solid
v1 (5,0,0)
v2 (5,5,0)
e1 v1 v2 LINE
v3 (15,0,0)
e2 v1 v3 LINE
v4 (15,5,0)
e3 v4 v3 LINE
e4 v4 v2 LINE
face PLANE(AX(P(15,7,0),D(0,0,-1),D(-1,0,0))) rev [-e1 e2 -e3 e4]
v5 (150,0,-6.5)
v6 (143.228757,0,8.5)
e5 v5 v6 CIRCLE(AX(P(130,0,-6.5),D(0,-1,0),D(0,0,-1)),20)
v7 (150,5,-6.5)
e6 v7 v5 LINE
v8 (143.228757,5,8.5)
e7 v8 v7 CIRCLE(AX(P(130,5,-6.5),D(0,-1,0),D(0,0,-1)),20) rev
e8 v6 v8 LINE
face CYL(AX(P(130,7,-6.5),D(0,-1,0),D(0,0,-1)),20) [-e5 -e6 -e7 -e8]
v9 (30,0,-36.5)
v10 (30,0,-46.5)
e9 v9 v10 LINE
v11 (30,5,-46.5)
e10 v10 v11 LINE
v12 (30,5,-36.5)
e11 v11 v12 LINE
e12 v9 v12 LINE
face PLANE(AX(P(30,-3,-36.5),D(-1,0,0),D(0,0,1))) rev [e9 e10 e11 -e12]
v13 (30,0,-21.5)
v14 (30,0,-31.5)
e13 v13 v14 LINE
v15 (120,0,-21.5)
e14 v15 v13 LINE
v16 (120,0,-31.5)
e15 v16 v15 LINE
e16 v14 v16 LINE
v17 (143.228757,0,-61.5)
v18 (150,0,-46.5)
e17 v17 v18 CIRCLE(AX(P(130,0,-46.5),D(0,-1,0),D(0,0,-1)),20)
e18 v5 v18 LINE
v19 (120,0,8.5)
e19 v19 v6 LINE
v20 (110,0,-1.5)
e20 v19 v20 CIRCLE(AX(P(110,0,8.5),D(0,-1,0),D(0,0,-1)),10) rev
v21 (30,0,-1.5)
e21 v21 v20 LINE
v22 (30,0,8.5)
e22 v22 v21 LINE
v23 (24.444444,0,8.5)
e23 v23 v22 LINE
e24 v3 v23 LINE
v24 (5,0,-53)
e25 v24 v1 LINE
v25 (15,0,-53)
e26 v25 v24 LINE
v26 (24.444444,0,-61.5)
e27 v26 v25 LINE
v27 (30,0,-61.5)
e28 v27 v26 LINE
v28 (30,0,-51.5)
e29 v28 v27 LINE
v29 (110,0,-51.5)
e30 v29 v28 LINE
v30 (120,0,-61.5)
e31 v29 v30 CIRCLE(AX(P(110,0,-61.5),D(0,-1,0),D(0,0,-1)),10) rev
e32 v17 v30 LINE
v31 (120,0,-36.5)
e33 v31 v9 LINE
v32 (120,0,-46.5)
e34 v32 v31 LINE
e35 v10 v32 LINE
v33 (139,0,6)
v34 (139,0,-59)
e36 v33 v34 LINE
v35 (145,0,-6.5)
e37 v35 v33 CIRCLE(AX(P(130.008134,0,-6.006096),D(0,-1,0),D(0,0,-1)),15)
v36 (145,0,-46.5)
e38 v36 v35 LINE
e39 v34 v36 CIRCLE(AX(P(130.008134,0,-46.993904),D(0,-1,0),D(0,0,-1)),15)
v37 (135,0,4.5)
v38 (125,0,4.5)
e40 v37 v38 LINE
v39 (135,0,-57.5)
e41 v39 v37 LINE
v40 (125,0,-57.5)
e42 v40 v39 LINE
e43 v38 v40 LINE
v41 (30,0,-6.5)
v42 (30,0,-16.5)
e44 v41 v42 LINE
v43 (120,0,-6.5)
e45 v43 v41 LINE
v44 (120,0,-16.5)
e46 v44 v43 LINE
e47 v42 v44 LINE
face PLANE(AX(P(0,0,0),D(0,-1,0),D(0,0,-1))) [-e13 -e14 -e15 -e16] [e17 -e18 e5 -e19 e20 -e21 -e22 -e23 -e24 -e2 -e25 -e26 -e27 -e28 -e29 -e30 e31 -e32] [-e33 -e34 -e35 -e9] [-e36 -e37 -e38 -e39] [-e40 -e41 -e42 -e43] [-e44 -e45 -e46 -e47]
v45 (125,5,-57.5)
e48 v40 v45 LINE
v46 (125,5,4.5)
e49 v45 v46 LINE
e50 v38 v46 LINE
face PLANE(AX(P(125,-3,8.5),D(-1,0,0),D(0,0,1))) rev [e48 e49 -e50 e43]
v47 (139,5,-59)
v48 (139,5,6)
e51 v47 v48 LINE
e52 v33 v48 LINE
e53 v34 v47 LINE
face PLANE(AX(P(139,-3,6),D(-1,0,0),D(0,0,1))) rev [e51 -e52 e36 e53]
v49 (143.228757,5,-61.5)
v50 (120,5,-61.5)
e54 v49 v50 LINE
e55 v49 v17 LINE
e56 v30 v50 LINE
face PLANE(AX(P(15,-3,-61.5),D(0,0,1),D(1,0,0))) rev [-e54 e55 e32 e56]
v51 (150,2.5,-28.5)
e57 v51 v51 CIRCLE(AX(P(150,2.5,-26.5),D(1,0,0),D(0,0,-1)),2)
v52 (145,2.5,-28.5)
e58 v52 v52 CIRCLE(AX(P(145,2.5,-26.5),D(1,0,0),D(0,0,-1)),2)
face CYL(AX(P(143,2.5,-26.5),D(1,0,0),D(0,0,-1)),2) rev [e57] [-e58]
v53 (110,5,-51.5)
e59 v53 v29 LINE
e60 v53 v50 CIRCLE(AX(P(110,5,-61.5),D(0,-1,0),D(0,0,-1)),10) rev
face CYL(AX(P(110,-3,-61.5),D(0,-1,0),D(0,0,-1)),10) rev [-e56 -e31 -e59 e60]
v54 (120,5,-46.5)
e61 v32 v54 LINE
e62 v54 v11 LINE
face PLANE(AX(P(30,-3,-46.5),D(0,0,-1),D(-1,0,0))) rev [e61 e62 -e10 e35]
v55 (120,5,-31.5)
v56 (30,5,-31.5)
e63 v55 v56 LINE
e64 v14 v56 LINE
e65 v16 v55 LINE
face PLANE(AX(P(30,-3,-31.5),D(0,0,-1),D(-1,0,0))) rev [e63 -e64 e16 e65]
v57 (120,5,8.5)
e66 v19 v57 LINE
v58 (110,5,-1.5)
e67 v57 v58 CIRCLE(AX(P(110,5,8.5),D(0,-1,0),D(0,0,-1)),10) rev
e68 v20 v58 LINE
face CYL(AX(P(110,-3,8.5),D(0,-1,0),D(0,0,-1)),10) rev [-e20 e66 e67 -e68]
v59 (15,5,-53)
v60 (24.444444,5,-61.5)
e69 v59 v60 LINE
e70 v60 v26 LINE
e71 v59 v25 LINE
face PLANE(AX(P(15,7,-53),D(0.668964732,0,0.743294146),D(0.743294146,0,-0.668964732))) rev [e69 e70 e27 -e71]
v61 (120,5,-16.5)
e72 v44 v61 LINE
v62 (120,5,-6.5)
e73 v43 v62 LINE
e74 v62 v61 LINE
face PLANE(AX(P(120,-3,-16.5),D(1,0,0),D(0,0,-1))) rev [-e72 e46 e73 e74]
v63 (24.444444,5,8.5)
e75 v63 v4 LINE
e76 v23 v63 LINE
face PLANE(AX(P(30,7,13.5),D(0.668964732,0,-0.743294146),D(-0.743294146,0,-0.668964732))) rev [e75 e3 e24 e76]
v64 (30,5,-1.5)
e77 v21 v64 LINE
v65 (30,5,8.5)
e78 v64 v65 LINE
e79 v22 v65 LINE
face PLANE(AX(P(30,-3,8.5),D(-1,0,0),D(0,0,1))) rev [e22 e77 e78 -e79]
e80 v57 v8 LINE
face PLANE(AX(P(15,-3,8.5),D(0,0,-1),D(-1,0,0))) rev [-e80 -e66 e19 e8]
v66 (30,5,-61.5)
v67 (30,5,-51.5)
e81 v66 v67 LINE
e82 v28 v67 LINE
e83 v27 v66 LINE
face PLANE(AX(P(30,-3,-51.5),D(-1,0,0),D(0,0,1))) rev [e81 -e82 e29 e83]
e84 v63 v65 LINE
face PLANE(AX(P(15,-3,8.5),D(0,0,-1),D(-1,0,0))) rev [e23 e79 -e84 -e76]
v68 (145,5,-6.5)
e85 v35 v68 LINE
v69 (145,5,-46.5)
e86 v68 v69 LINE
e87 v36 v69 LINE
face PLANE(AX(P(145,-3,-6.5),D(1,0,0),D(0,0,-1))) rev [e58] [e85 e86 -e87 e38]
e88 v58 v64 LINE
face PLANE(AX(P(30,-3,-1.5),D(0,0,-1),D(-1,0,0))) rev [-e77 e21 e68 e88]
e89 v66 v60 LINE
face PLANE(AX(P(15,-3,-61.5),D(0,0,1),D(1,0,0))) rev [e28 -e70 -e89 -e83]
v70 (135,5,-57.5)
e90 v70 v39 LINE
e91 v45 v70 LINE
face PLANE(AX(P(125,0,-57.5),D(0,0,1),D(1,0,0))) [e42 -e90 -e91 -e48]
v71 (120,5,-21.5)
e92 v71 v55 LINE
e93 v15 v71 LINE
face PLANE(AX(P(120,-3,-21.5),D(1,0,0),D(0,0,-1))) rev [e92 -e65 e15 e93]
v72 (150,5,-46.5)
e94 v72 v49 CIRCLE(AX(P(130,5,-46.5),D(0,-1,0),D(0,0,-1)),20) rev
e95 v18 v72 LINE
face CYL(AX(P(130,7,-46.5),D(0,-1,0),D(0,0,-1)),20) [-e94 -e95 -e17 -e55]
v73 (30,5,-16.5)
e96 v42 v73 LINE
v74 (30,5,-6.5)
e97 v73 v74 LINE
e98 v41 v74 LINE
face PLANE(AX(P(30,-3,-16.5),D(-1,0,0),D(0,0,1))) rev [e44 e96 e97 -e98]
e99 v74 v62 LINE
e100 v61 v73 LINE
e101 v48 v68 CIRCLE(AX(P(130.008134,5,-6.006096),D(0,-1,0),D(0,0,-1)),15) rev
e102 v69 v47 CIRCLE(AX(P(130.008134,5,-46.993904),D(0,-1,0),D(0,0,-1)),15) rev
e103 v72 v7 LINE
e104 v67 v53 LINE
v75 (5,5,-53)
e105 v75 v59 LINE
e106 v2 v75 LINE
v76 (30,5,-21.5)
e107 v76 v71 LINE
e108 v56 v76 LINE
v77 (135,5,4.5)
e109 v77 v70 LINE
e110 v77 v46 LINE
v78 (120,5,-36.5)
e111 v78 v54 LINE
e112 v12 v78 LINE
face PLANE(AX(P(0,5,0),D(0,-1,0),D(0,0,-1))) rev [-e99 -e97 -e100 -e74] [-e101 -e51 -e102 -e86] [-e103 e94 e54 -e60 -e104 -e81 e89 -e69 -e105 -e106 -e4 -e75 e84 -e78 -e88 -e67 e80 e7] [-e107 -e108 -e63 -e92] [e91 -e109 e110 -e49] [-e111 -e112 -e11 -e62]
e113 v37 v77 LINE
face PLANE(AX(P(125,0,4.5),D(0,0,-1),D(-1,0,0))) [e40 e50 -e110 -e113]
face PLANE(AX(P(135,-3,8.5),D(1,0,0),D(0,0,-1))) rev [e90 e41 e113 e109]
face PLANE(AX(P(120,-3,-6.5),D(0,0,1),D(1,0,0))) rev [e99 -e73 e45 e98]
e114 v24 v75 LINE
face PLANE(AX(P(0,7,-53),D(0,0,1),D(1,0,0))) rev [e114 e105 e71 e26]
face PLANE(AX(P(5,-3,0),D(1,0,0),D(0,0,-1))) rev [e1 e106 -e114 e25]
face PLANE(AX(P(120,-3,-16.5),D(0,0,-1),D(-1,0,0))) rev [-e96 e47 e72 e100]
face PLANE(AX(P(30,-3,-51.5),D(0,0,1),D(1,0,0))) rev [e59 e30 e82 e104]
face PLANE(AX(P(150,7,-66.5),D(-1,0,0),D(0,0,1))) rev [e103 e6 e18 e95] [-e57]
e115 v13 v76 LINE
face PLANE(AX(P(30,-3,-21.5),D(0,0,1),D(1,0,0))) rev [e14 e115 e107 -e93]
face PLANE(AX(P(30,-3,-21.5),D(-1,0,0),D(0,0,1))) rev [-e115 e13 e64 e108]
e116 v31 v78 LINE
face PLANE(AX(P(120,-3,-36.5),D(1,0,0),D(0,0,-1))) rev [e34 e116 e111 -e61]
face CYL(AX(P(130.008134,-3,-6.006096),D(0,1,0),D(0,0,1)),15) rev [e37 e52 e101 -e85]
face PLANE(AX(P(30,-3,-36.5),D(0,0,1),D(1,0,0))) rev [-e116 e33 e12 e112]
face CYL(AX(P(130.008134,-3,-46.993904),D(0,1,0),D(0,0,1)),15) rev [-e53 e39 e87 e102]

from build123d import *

# Parameters (mm, degrees)
Y_KSEKLIK_EKSTR_ZYON1_DEPTH = 7
IZIM2_R                     = 1.5
KES_EKSTR_ZYON1_DEPTH       = 7
PAH1_SIZE                   = 2.5
IZIM3_R                     = 2
KES_EKSTR_ZYON2_DEPTH       = 10
KES_EKSTR_ZYON3_START       = -10
IZIM4_R                     = 2
KES_EKSTR_ZYON3_DEPTH       = 10
RADYUS1_R                   = 20
IZIM5_W                     = 90
IZIM5_H                     = 10
IZIM5_W_2                   = 10
IZIM5_H_2                   = 70
KES_EKSTR_ZYON4_DEPTH       = 10
RADYUS2_R                   = 4
KES_EKSTR_ZYON5_DEPTH       = 10
IZIM8_W                     = 5
IZIM8_H                     = 53
KES_EKSTR_ZYON6_DEPTH       = 10
IZIM9_W                     = 8.724341423
IZIM9_H                     = 2.178581573
IZIM9_W_2                   = 9.164333206
Y_KSEKLIK_EKSTR_ZYON2_DEPTH = 10
IZIM10_W                    = 140
IZIM10_H                    = 10
KES_EKSTR_ZYON7_DEPTH       = 10
IZIM11_W                    = 10
IZIM11_H                    = 4
Y_KSEKLIK_EKSTR_ZYON3_DEPTH = 7
RADYUS3_R                   = 10
IZIM12_W                    = 4
IZIM12_H                    = 7
Y_KSEKLIK_EKSTR_ZYON4_DEPTH = 7
RADYUS4_R                   = 5
IZIM13_R                    = 1.5
KES_EKSTR_ZYON8_DEPTH       = 7
PAH2_SIZE                   = 1.5
RADYUS5_R                   = 2
IZIM14_W                    = 144.535934645
IZIM14_H                    = 70
KES_EKSTR_ZYON9_DEPTH       = 2
RADYUS6_R                   = 2
IZIM16_R                    = 2
KES_EKSTR_ZYON11_DEPTH      = 7
KES_EKSTR_ZYON12_DEPTH      = 10


# Some blends are built 0.0001 mm under size
with BuildPart() as part:
    # Çizim1 → Yükseklik-Ekstrüzyon1 (new body)
    with BuildSketch(Plane(origin=(0, 0, 0), x_dir=(1, 0, 0), z_dir=(0, 1, 0))):
        Polygon((0, 0), (0, 53), (15, 53), (30, 66.5), (150, 66.5), (150, -13.5), (30, -13.5), (15, 0), align=None)
    extrude(amount=Y_KSEKLIK_EKSTR_ZYON1_DEPTH)

    # Çizim2 → Kes-Ekstrüzyon1 (cut)
    with BuildSketch(Plane(origin=(0, 7, 0), x_dir=(1, 0, 0), z_dir=(0, 1, 0))):
        with Locations(Location((2.5, 41.25, 0), (0, 0, 270))):
            Circle(IZIM2_R)
        with Locations(Location((2.5, 11.75, 0), (0, 0, 270))):
            Circle(IZIM2_R)
    extrude(amount=-KES_EKSTR_ZYON1_DEPTH, mode=Mode.SUBTRACT)

    # Pah1
    # the kernel refuses this chamfer: 2.5 mm, written as the material it takes off along each edge
    with BuildSketch(Plane(origin=(2.5, 7, -41.25), x_dir=(0, 0, 1), z_dir=(-1, 0, 0))) as pah1_piece_1:
        Polygon((1.5 + PAH1_SIZE, 0), (1.5, -PAH1_SIZE), (1.5, 0), align=None)
    revolve(axis=Axis((2.5, 7, -41.25), (0, 1, 0)), mode=Mode.SUBTRACT)
    with BuildSketch(Plane(origin=(2.5, 7, -11.75), x_dir=(0, 0, 1), z_dir=(-1, 0, 0))) as pah1_piece_2:
        Polygon((1.5 + PAH1_SIZE, 0), (1.5, -PAH1_SIZE), (1.5, 0), align=None)
    revolve(axis=Axis((2.5, 7, -11.75), (0, 1, 0)), mode=Mode.SUBTRACT)

    # Çizim3 → Kes-Ekstrüzyon2 (cut)
    with BuildSketch(Plane.XY.offset(13.5)):
        with Locations((46.24, 3.5)):
            Circle(IZIM3_R)
    extrude(amount=-KES_EKSTR_ZYON2_DEPTH, mode=Mode.SUBTRACT)

    # Çizim4 → Kes-Ekstrüzyon3 (cut)
    with BuildSketch(Plane(origin=(0, 0, -66.5), x_dir=(-1, 0, 0), z_dir=(0, 0, -1)).offset(KES_EKSTR_ZYON3_START)):
        with Locations(Location((-46.24, 3.5, 0), (0, 0, 180))):
            Circle(IZIM4_R)
    extrude(amount=KES_EKSTR_ZYON3_DEPTH, mode=Mode.SUBTRACT)

    # Radyus1
    radyus1_edges = [part.edges().sort_by_distance(p)[0] for p in [
        (150, 3.5, -66.5),
        (150, 3.5, 13.5),
    ]]
    fillet(radyus1_edges, radius=RADYUS1_R)

    # Çizim5 → Kes-Ekstrüzyon4 (cut)
    with BuildSketch(Plane(origin=(0, 7, 0), x_dir=(1, 0, 0), z_dir=(0, 1, 0))):
        with Locations((75, -3.5)):
            Rectangle(IZIM5_W, IZIM5_H)
        with Locations((75, 26.5)):
            Rectangle(IZIM5_W, IZIM5_H)
        with Locations((75, 41.5)):
            Rectangle(IZIM5_W, IZIM5_H)
        with Locations((75, 56.5)):
            Rectangle(IZIM5_W, IZIM5_H)
        with Locations((75, 11.5)):
            Rectangle(IZIM5_W, IZIM5_H)
        with Locations((130, 26.5)):
            Rectangle(IZIM5_W_2, IZIM5_H_2)
    extrude(amount=-KES_EKSTR_ZYON4_DEPTH, mode=Mode.SUBTRACT)

    # Radyus2
    radyus2_edges = [part.edges().sort_by_distance(p)[0] for p in [
        (135, 3.5, -61.5),
        (135, 3.5, 8.5),
    ]]
    fillet(radyus2_edges, radius=RADYUS2_R)

    # Çizim6 → Kes-Ekstrüzyon5 (cut)
    with BuildSketch(Plane(origin=(0, 7, 0), x_dir=(1, 0, 0), z_dir=(0, 1, 0))):
        with BuildLine():
            Line((139, -6), (139, 59))
            ThreePointArc((139, 59), (143.530979443, 53.484870133), (145, 46.5))
            Line((145, 46.5), (145, 6.5))
            ThreePointArc((145, 6.5), (143.530979443, -0.484870133), (139, -6))
        make_face()
    extrude(amount=-KES_EKSTR_ZYON5_DEPTH, mode=Mode.SUBTRACT)

    # Çizim8 → Kes-Ekstrüzyon6 (cut)
    with BuildSketch(Plane(origin=(0, 7, 0), x_dir=(1, 0, 0), z_dir=(0, 1, 0))):
        with Locations((2.5, 26.5)):
            Rectangle(IZIM8_W, IZIM8_H)
    extrude(amount=-KES_EKSTR_ZYON6_DEPTH, mode=Mode.SUBTRACT)

    # Çizim9 → Yükseklik-Ekstrüzyon2 (add)
    with BuildSketch(Plane.ZY.offset(-5)):
        with Locations((-12.430411948, 5.910709214)):
            Rectangle(IZIM9_W, IZIM9_H)
        with Locations((-41.247168871, 5.910709214)):
            Rectangle(IZIM9_W_2, IZIM9_H)
    extrude(amount=-Y_KSEKLIK_EKSTR_ZYON2_DEPTH)

    # Çizim10 → Kes-Ekstrüzyon7 (cut)
    with BuildSketch(Plane(origin=(0, 7, 0), x_dir=(1, 0, 0), z_dir=(0, 1, 0))):
        with Locations((85, -13.5)):
            Rectangle(IZIM10_W, IZIM10_H)
        with Locations((85, 66.5)):
            Rectangle(IZIM10_W, IZIM10_H)
    extrude(amount=-KES_EKSTR_ZYON7_DEPTH, mode=Mode.SUBTRACT)


with BuildPart() as kes_ekstr_zyon7_piece_1:
    # of the separate pieces the step leaves, piece 1, a body of its own (kes_ekstr_zyon7_pieces)
    add(part.part.solids().sort_by_distance((24.444444444, 0, 8.5))[0])



with BuildPart() as kes_ekstr_zyon7_piece_2:
    # of the separate pieces the step leaves, piece 2, a body of its own (kes_ekstr_zyon7_pieces)
    add(part.part.solids().sort_by_distance((143.228756555, 0, 8.5))[0])


with BuildPart() as kes_ekstr_zyon7_piece_1_1:
    add(kes_ekstr_zyon7_piece_1.part)

    add(kes_ekstr_zyon7_piece_2.part)  # Yükseklik-Ekstrüzyon3 merges Kes-Ekstrüzyon7 piece 2
    # Çizim11 → Yükseklik-Ekstrüzyon3 (add)
    with BuildSketch(Plane(origin=(0, 7, 0), x_dir=(1, 0, 0), z_dir=(0, 1, 0))):
        with Locations((130, -6.5)):
            Rectangle(IZIM11_W, IZIM11_H)
        with Locations((130, 59.5)):
            Rectangle(IZIM11_W, IZIM11_H)
    extrude(amount=-Y_KSEKLIK_EKSTR_ZYON3_DEPTH)

    # Radyus3
    radyus3_edges = [kes_ekstr_zyon7_piece_1_1.edges().sort_by_distance(p)[0] for p in [
        (120, 3.5, -1.5),
        (120, 3.5, -51.5),
    ]]
    fillet(radyus3_edges, radius=RADYUS3_R - 0.0001)  # a hair under: the kernel refuses the full size

    # Çizim12 → Yükseklik-Ekstrüzyon4 (add)
    with BuildSketch(Plane(origin=(0, 7, 0), x_dir=(1, 0, 0), z_dir=(0, 1, 0))):
        with Locations((7, 15)):
            Rectangle(IZIM12_W, IZIM12_H)
        with Locations((7, 38)):
            Rectangle(IZIM12_W, IZIM12_H)
    extrude(amount=Y_KSEKLIK_EKSTR_ZYON4_DEPTH)

    # Radyus4
    radyus4_edges = [kes_ekstr_zyon7_piece_1_1.edges().sort_by_distance(p)[0] for p in [
        (7, 7, -11.5),
        (7, 7, -18.5),
        (7, 7, -34.5),
        (7, 7, -41.5),
    ]]
    fillet(radyus4_edges, radius=RADYUS4_R)

    # Çizim13 → Kes-Ekstrüzyon8 (cut)
    with BuildSketch(Plane.ZY.offset(-5)):
        with Locations((-38, 10.5)):
            Circle(IZIM13_R)
        with Locations((-15, 10.5)):
            Circle(IZIM13_R)
    extrude(amount=-KES_EKSTR_ZYON8_DEPTH, mode=Mode.SUBTRACT)

    # Pah2
    pah2_edges = [kes_ekstr_zyon7_piece_1_1.edges().sort_by_distance(p)[0] for p in [
        (9, 10.5, -39.5),
        (9, 10.5, -16.5),
    ]]
    chamfer(pah2_edges, length=PAH2_SIZE)

    # Radyus5
    radyus5_edges = [kes_ekstr_zyon7_piece_1_1.edges().sort_by_distance(p)[0] for p in [
        (7, 14, -41.5),
        (7, 14, -34.5),
        (7, 14, -11.5),
        (7, 14, -18.5),
    ]]
    fillet(radyus5_edges, radius=RADYUS5_R - 0.0001)  # a hair under: the kernel refuses the full size

    # Çizim14 → Kes-Ekstrüzyon9 (cut)
    with BuildSketch(Plane(origin=(0, 7, 0), x_dir=(1, 0, 0), z_dir=(0, 1, 0))):
        with Locations((81.267967322, 26.5)):
            Rectangle(IZIM14_W, IZIM14_H)
    extrude(amount=-KES_EKSTR_ZYON9_DEPTH, mode=Mode.SUBTRACT)

    # Radyus6
    radyus6_edges = [kes_ekstr_zyon7_piece_1_1.edges().sort_by_distance(p)[0] for p in [
        (7, 7, -53),
        (7, 7, 0),
    ]]
    fillet(radyus6_edges, radius=RADYUS6_R)

    # Çizim16 → Kes-Ekstrüzyon11 (cut)
    with BuildSketch(Plane(origin=(150, 0, 0), x_dir=(0, 0, -1), z_dir=(1, 0, 0))):
        with Locations((26.5, 2.5)):
            Circle(IZIM16_R)
    extrude(amount=-KES_EKSTR_ZYON11_DEPTH, mode=Mode.SUBTRACT)

    # Çizim17 → Kes-Ekstrüzyon12 (cut)
    with BuildSketch(Plane(origin=(9, 0, 0), x_dir=(0, 0, -1), z_dir=(1, 0, 0))):
        with BuildLine():
            Line((0, 5), (53, 5))
            ThreePointArc((53, 5), (52.414213562, 6.414213562), (51, 7))
            Line((51, 7), (46.5, 7))
            ThreePointArc((46.5, 7), (42.964466094, 8.464466094), (41.5, 12))
            ThreePointArc((41.5, 12), (40.914213562, 13.414213562), (39.5, 14))
            Line((39.5, 14), (36.5, 14))
            ThreePointArc((36.5, 14), (35.085786438, 13.414213562), (34.5, 12))
            ThreePointArc((34.5, 12), (33.035533906, 8.464466094), (29.5, 7))
            Line((29.5, 7), (23.5, 7))
            ThreePointArc((23.5, 7), (19.964466094, 8.464466094), (18.5, 12))
            ThreePointArc((18.5, 12), (17.914213562, 13.414213562), (16.5, 14))
            Line((16.5, 14), (13.5, 14))
            ThreePointArc((13.5, 14), (12.085786438, 13.414213562), (11.5, 12))
            ThreePointArc((11.5, 12), (10.035533906, 8.464466094), (6.5, 7))
            Line((6.5, 7), (2, 7))
            ThreePointArc((2, 7), (0.585786438, 6.414213562), (0, 5))
        make_face()
    extrude(amount=-KES_EKSTR_ZYON12_DEPTH, mode=Mode.SUBTRACT)


with BuildPart() as kes_ekstr_zyon12_kept_piece:
    # of the separate pieces the step leaves, the one the design keeps (kes_ekstr_zyon12_pieces_kept)
    add(kes_ekstr_zyon7_piece_1_1.part.solids().sort_by_distance((5, 5, 0))[0])


solid = kes_ekstr_zyon12_kept_piece.part
